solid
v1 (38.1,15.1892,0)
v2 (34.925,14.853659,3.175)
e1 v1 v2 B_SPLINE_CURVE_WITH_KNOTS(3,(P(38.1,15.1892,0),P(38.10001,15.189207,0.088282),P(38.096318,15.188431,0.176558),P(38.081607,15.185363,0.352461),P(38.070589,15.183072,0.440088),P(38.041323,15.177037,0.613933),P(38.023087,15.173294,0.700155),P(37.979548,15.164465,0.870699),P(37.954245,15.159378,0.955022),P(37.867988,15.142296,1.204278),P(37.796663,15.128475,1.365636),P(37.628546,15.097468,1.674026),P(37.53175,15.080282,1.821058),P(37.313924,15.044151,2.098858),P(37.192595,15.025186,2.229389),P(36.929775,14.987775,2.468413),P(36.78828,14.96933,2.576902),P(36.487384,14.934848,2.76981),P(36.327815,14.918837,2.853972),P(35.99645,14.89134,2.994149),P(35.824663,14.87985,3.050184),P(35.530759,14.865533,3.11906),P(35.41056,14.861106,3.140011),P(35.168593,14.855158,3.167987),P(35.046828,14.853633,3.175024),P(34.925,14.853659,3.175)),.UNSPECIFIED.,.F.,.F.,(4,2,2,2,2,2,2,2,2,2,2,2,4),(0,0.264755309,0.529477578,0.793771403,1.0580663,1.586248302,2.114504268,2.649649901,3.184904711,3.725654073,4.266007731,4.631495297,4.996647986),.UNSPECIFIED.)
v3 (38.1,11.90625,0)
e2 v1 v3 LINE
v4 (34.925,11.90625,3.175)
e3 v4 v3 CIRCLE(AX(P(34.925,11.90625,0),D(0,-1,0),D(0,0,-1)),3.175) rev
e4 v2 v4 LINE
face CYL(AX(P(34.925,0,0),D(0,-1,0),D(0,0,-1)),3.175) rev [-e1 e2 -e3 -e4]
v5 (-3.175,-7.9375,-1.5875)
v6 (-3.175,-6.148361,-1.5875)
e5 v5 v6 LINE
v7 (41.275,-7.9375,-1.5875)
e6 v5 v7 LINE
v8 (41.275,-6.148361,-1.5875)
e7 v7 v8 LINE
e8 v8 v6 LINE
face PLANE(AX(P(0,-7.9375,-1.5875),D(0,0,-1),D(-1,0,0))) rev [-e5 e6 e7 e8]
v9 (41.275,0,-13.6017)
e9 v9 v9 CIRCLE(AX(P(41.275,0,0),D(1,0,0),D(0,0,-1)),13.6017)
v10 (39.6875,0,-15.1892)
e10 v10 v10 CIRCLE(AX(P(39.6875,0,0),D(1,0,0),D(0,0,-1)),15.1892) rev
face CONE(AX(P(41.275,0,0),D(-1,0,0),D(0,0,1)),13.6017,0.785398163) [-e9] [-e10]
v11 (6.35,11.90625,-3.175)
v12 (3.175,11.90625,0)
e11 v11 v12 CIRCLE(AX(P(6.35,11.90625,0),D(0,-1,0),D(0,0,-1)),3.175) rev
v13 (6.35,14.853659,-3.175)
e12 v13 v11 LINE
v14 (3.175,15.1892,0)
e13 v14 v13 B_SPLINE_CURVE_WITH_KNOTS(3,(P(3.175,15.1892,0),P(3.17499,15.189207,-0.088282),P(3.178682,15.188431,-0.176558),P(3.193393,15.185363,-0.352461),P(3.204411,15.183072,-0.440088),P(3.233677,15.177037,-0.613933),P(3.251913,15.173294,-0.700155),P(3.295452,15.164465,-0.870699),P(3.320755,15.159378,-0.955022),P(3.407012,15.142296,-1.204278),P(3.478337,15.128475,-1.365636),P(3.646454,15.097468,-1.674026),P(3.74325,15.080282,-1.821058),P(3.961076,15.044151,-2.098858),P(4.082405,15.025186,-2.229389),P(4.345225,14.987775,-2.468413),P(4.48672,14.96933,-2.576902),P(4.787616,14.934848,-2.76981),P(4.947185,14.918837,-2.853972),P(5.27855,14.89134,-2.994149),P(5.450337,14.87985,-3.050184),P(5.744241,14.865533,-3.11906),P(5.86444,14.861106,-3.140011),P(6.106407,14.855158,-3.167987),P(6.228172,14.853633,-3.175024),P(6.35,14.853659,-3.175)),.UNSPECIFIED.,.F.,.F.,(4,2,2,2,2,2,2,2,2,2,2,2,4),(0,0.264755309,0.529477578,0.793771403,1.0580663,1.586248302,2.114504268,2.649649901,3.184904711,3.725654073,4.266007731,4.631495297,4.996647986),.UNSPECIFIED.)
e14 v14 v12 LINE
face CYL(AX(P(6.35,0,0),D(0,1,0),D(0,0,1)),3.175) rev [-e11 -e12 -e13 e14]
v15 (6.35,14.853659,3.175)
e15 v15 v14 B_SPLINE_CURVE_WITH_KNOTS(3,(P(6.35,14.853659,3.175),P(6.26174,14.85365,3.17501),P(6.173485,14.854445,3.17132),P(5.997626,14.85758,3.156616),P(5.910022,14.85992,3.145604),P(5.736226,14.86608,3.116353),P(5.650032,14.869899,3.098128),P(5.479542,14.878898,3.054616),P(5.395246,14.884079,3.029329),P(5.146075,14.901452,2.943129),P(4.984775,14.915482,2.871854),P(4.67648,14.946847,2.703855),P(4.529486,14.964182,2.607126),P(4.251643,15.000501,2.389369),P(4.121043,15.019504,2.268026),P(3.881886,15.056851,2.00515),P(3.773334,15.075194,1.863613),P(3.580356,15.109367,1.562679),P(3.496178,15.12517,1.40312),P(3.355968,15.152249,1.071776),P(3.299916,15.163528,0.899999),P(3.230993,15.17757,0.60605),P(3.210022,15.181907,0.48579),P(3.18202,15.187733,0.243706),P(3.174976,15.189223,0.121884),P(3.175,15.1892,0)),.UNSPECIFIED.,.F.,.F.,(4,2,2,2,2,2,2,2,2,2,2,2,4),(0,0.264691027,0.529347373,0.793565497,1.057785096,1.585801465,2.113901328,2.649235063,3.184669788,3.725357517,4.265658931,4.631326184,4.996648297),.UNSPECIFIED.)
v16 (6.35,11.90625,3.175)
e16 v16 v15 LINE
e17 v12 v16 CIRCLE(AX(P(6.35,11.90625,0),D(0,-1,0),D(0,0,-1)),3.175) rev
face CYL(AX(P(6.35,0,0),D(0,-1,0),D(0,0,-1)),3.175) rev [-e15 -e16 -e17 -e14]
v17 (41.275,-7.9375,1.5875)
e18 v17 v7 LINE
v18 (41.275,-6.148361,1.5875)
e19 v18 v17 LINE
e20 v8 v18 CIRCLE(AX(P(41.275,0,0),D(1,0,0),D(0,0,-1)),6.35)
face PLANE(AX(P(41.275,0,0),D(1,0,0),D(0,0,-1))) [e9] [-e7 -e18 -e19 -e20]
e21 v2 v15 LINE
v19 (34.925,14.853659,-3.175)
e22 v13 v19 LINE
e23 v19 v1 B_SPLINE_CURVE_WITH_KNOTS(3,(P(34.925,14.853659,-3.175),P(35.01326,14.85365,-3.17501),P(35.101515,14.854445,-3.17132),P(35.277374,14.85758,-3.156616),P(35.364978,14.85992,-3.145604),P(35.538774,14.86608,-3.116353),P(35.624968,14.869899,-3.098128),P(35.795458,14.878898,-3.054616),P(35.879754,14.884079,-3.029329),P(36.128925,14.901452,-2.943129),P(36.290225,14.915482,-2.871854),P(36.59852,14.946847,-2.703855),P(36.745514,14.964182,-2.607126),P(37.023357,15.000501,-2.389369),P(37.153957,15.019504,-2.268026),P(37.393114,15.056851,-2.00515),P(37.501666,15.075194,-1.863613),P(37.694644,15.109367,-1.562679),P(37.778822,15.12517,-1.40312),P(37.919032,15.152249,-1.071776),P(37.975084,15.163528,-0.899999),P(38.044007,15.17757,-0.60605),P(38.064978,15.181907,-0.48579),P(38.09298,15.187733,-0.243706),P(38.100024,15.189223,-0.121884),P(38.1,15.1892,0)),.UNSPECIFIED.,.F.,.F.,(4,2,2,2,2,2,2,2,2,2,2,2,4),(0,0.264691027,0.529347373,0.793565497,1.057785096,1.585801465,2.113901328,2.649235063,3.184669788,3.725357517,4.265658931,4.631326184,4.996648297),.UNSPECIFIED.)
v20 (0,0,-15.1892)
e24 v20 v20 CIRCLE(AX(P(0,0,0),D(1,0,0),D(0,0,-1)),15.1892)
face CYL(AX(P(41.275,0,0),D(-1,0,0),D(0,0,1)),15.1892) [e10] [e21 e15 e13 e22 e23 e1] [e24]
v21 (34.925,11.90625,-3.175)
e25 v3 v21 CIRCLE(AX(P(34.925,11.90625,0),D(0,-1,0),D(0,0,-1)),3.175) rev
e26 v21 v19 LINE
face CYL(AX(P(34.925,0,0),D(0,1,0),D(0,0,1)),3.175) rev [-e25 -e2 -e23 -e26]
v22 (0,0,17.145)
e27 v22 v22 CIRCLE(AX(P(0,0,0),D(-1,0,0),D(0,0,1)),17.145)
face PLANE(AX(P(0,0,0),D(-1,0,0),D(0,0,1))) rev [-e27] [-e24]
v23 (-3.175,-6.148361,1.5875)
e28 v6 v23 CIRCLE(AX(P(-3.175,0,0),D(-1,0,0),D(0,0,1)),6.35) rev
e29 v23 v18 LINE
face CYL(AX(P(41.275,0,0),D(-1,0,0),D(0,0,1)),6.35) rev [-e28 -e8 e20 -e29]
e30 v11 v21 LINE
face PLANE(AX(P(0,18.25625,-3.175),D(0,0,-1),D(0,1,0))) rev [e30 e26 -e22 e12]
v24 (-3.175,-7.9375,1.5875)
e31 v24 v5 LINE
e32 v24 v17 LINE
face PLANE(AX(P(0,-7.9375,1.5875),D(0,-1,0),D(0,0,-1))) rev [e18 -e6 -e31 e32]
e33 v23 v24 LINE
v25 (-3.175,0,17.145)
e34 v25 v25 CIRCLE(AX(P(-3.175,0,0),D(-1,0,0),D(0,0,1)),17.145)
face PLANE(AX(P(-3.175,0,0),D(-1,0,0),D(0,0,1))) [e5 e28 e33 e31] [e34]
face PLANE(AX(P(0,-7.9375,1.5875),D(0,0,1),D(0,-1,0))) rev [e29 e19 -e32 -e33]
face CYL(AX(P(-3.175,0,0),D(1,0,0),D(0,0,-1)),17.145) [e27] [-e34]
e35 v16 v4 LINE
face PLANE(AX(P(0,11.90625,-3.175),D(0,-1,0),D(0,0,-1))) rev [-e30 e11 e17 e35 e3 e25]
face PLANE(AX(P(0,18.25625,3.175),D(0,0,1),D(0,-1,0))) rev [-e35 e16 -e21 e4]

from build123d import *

# Parameters (mm, degrees)
SKETCH1_R           = 15.1892
SKETCH1_R_2         = 6.35
BOSS_EXTRUDE1_DEPTH = 41.275
SKETCH2_W           = 3.175
SKETCH2_H           = 3.175
SKETCH2_W_2         = 6.35
SKETCH2_H_2         = 6.35
CUT_EXTRUDE1_DEPTH  = 47.530089
BOSS_EXTRUDE2_START = 3.175
SKETCH3_R           = 17.145
BOSS_EXTRUDE2_DEPTH = 3.175
BOSS_EXTRUDE3_DEPTH = 3.175
BOSS_EXTRUDE4_START = -3.175
SKETCH5_R           = 15.1892
SKETCH5_R_2         = 10.967899
BOSS_EXTRUDE4_DEPTH = 3.175
FILLET1_R           = 3.175
CHAMFER1_SIZE       = 1.5875


with BuildPart() as part:
    # Sketch1 → Boss-Extrude1 (new body)
    with BuildSketch(Plane(origin=(0, 0, 0), x_dir=(0, 0, -1), z_dir=(1, 0, 0))):
        Circle(SKETCH1_R)
        Circle(SKETCH1_R_2, mode=Mode.SUBTRACT)
    extrude(amount=BOSS_EXTRUDE1_DEPTH)

    # Sketch2 → Cut-Extrude1 (cut, through all)
    with BuildSketch(Plane(origin=(41.275, 0, 0), x_dir=(0, 0, -1), z_dir=(1, 0, 0))):
        with Locations((0, -6.35)):
            Rectangle(SKETCH2_W, SKETCH2_H)
        with Locations((0, 15.08125)):
            Rectangle(SKETCH2_W_2, SKETCH2_H_2)
    extrude(amount=-CUT_EXTRUDE1_DEPTH, mode=Mode.SUBTRACT)

    # Sketch3 → Boss-Extrude2 (add)
    # profile 1 of 2: a face of its own
    with BuildSketch(Plane.ZY.offset(BOSS_EXTRUDE2_START)):
        Circle(SKETCH3_R)
        with BuildLine():
            Line((-3.175, 11.90625), (3.175, 11.90625))
            Line((3.175, 11.90625), (3.175, 14.853659))
            ThreePointArc((3.175, 14.853659), (0, -15.1892), (-3.175, 14.853659))
            Line((-3.175, 14.853659), (-3.175, 11.90625))
        make_face(mode=Mode.SUBTRACT)
    # profile 2 of 2: a face of its own
    with BuildSketch(Plane.ZY.offset(BOSS_EXTRUDE2_START)):
        with BuildLine():
            Line((3.175, 14.853659), (3.175, 11.90625))
            Line((3.175, 11.90625), (-3.175, 11.90625))
            Line((-3.175, 11.90625), (-3.175, 14.853659))
            ThreePointArc((-3.175, 14.853659), (0, -15.1892), (3.175, 14.853659))
        make_face()
        with BuildLine():
            Line((-1.5875, -7.9375), (-1.5875, -6.148361))
            ThreePointArc((-1.5875, -6.148361), (0, 6.35), (1.5875, -6.148361))
            Line((1.5875, -6.148361), (1.5875, -7.9375))
            Line((1.5875, -7.9375), (-1.5875, -7.9375))
        make_face(mode=Mode.SUBTRACT)
    extrude(amount=-BOSS_EXTRUDE2_DEPTH)

    # Sketch4 → Boss-Extrude3 (add)
    with BuildSketch(Plane(origin=(0, 0, 0), x_dir=(0, 0, -1), z_dir=(1, 0, 0))):
        with BuildLine():
            ThreePointArc((3.175, 14.853659), (0, 15.1892), (-3.175, 14.853659))
            Line((-3.175, 14.853659), (-3.175, 11.90625))
            Line((-3.175, 11.90625), (3.175, 11.90625))
            Line((3.175, 11.90625), (3.175, 14.827684))
            Line((3.175, 14.827684), (3.175, 14.853659))
        make_face()
    extrude(amount=BOSS_EXTRUDE3_DEPTH)

    # Sketch5 → Boss-Extrude4 (add)
    with BuildSketch(Plane(origin=(41.275, 0, 0), x_dir=(0, 0, -1), z_dir=(1, 0, 0)).offset(BOSS_EXTRUDE4_START)):
        Circle(SKETCH5_R)
        Circle(SKETCH5_R_2, mode=Mode.SUBTRACT)
    extrude(amount=BOSS_EXTRUDE4_DEPTH)

    # Fillet1
    # the kernel refuses this fillet: 3.175 mm, written as the material it adds along each edge
    with BuildSketch(Plane(origin=(3.175, 22.791159, -3.175), x_dir=(1, 0, 0), z_dir=(0, -1, 0))) as fillet1_piece_1_section:
        with BuildLine():
            CenterArc((FILLET1_R, FILLET1_R), FILLET1_R, 180, 90)
            Line((0, FILLET1_R), (0, 0))
            Line((0, 0), (FILLET1_R, 0))
        make_face()
    fillet1_piece_1 = extrude(amount=10.884909, mode=Mode.PRIVATE)
    fillet1_piece_1 = fillet1_piece_1 & Plane(origin=(3.873842, 0, 0), x_dir=(0, 0, -1), z_dir=(-1, 0, 0)) * Cylinder(15.1892, 35, mode=Mode.PRIVATE)
    add(fillet1_piece_1)
    with BuildSketch(Plane(origin=(3.175, 22.791159, 3.175), x_dir=(1, 0, 0), z_dir=(0, -1, 0))) as fillet1_piece_2_section:
        with BuildLine():
            CenterArc((FILLET1_R, -FILLET1_R), FILLET1_R, 90, 90)
            Line((0, -FILLET1_R), (0, 0))
            Line((0, 0), (FILLET1_R, 0))
        make_face()
    fillet1_piece_2 = extrude(amount=10.884909, mode=Mode.PRIVATE)
    fillet1_piece_2 = fillet1_piece_2 & Plane(origin=(3.873846, 0, 0), x_dir=(0, 0, -1), z_dir=(-1, 0, 0)) * Cylinder(15.1892, 35, mode=Mode.PRIVATE)
    add(fillet1_piece_2)
    with BuildSketch(Plane(origin=(38.1, 11.90625, 3.175), x_dir=(0, 0, -1), z_dir=(0, 1, 0))) as fillet1_piece_3_section:
        with BuildLine():
            CenterArc((FILLET1_R, FILLET1_R), FILLET1_R, 180, 90)
            Line((0, FILLET1_R), (0, 0))
            Line((0, 0), (FILLET1_R, 0))
        make_face()
    fillet1_piece_3 = extrude(amount=10.884909, mode=Mode.PRIVATE)
    fillet1_piece_3 = fillet1_piece_3 & Plane(origin=(37.401164, 0, 0), x_dir=(0, 0, -1), z_dir=(-1, 0, 0)) * Cylinder(15.1892, 35, mode=Mode.PRIVATE)
    add(fillet1_piece_3)
    with BuildSketch(Plane(origin=(38.1, 22.791159, -3.175), x_dir=(-1, 0, 0), z_dir=(0, -1, 0))) as fillet1_piece_4_section:
        with BuildLine():
            CenterArc((FILLET1_R, -FILLET1_R), FILLET1_R, 90, 90)
            Line((0, -FILLET1_R), (0, 0))
            Line((0, 0), (FILLET1_R, 0))
        make_face()
    fillet1_piece_4 = extrude(amount=10.884909, mode=Mode.PRIVATE)
    fillet1_piece_4 = fillet1_piece_4 & Plane(origin=(37.401158, 0, 0), x_dir=(0, 0, -1), z_dir=(-1, 0, 0)) * Cylinder(15.1892, 35, mode=Mode.PRIVATE)
    add(fillet1_piece_4)

    # Chamfer1
    chamfer1_edges = [part.edges().sort_by_distance(p)[0] for p in [
        (41.275, -14.853659, 3.175),
    ]]
    chamfer(chamfer1_edges, length=CHAMFER1_SIZE)


solid = part.part
